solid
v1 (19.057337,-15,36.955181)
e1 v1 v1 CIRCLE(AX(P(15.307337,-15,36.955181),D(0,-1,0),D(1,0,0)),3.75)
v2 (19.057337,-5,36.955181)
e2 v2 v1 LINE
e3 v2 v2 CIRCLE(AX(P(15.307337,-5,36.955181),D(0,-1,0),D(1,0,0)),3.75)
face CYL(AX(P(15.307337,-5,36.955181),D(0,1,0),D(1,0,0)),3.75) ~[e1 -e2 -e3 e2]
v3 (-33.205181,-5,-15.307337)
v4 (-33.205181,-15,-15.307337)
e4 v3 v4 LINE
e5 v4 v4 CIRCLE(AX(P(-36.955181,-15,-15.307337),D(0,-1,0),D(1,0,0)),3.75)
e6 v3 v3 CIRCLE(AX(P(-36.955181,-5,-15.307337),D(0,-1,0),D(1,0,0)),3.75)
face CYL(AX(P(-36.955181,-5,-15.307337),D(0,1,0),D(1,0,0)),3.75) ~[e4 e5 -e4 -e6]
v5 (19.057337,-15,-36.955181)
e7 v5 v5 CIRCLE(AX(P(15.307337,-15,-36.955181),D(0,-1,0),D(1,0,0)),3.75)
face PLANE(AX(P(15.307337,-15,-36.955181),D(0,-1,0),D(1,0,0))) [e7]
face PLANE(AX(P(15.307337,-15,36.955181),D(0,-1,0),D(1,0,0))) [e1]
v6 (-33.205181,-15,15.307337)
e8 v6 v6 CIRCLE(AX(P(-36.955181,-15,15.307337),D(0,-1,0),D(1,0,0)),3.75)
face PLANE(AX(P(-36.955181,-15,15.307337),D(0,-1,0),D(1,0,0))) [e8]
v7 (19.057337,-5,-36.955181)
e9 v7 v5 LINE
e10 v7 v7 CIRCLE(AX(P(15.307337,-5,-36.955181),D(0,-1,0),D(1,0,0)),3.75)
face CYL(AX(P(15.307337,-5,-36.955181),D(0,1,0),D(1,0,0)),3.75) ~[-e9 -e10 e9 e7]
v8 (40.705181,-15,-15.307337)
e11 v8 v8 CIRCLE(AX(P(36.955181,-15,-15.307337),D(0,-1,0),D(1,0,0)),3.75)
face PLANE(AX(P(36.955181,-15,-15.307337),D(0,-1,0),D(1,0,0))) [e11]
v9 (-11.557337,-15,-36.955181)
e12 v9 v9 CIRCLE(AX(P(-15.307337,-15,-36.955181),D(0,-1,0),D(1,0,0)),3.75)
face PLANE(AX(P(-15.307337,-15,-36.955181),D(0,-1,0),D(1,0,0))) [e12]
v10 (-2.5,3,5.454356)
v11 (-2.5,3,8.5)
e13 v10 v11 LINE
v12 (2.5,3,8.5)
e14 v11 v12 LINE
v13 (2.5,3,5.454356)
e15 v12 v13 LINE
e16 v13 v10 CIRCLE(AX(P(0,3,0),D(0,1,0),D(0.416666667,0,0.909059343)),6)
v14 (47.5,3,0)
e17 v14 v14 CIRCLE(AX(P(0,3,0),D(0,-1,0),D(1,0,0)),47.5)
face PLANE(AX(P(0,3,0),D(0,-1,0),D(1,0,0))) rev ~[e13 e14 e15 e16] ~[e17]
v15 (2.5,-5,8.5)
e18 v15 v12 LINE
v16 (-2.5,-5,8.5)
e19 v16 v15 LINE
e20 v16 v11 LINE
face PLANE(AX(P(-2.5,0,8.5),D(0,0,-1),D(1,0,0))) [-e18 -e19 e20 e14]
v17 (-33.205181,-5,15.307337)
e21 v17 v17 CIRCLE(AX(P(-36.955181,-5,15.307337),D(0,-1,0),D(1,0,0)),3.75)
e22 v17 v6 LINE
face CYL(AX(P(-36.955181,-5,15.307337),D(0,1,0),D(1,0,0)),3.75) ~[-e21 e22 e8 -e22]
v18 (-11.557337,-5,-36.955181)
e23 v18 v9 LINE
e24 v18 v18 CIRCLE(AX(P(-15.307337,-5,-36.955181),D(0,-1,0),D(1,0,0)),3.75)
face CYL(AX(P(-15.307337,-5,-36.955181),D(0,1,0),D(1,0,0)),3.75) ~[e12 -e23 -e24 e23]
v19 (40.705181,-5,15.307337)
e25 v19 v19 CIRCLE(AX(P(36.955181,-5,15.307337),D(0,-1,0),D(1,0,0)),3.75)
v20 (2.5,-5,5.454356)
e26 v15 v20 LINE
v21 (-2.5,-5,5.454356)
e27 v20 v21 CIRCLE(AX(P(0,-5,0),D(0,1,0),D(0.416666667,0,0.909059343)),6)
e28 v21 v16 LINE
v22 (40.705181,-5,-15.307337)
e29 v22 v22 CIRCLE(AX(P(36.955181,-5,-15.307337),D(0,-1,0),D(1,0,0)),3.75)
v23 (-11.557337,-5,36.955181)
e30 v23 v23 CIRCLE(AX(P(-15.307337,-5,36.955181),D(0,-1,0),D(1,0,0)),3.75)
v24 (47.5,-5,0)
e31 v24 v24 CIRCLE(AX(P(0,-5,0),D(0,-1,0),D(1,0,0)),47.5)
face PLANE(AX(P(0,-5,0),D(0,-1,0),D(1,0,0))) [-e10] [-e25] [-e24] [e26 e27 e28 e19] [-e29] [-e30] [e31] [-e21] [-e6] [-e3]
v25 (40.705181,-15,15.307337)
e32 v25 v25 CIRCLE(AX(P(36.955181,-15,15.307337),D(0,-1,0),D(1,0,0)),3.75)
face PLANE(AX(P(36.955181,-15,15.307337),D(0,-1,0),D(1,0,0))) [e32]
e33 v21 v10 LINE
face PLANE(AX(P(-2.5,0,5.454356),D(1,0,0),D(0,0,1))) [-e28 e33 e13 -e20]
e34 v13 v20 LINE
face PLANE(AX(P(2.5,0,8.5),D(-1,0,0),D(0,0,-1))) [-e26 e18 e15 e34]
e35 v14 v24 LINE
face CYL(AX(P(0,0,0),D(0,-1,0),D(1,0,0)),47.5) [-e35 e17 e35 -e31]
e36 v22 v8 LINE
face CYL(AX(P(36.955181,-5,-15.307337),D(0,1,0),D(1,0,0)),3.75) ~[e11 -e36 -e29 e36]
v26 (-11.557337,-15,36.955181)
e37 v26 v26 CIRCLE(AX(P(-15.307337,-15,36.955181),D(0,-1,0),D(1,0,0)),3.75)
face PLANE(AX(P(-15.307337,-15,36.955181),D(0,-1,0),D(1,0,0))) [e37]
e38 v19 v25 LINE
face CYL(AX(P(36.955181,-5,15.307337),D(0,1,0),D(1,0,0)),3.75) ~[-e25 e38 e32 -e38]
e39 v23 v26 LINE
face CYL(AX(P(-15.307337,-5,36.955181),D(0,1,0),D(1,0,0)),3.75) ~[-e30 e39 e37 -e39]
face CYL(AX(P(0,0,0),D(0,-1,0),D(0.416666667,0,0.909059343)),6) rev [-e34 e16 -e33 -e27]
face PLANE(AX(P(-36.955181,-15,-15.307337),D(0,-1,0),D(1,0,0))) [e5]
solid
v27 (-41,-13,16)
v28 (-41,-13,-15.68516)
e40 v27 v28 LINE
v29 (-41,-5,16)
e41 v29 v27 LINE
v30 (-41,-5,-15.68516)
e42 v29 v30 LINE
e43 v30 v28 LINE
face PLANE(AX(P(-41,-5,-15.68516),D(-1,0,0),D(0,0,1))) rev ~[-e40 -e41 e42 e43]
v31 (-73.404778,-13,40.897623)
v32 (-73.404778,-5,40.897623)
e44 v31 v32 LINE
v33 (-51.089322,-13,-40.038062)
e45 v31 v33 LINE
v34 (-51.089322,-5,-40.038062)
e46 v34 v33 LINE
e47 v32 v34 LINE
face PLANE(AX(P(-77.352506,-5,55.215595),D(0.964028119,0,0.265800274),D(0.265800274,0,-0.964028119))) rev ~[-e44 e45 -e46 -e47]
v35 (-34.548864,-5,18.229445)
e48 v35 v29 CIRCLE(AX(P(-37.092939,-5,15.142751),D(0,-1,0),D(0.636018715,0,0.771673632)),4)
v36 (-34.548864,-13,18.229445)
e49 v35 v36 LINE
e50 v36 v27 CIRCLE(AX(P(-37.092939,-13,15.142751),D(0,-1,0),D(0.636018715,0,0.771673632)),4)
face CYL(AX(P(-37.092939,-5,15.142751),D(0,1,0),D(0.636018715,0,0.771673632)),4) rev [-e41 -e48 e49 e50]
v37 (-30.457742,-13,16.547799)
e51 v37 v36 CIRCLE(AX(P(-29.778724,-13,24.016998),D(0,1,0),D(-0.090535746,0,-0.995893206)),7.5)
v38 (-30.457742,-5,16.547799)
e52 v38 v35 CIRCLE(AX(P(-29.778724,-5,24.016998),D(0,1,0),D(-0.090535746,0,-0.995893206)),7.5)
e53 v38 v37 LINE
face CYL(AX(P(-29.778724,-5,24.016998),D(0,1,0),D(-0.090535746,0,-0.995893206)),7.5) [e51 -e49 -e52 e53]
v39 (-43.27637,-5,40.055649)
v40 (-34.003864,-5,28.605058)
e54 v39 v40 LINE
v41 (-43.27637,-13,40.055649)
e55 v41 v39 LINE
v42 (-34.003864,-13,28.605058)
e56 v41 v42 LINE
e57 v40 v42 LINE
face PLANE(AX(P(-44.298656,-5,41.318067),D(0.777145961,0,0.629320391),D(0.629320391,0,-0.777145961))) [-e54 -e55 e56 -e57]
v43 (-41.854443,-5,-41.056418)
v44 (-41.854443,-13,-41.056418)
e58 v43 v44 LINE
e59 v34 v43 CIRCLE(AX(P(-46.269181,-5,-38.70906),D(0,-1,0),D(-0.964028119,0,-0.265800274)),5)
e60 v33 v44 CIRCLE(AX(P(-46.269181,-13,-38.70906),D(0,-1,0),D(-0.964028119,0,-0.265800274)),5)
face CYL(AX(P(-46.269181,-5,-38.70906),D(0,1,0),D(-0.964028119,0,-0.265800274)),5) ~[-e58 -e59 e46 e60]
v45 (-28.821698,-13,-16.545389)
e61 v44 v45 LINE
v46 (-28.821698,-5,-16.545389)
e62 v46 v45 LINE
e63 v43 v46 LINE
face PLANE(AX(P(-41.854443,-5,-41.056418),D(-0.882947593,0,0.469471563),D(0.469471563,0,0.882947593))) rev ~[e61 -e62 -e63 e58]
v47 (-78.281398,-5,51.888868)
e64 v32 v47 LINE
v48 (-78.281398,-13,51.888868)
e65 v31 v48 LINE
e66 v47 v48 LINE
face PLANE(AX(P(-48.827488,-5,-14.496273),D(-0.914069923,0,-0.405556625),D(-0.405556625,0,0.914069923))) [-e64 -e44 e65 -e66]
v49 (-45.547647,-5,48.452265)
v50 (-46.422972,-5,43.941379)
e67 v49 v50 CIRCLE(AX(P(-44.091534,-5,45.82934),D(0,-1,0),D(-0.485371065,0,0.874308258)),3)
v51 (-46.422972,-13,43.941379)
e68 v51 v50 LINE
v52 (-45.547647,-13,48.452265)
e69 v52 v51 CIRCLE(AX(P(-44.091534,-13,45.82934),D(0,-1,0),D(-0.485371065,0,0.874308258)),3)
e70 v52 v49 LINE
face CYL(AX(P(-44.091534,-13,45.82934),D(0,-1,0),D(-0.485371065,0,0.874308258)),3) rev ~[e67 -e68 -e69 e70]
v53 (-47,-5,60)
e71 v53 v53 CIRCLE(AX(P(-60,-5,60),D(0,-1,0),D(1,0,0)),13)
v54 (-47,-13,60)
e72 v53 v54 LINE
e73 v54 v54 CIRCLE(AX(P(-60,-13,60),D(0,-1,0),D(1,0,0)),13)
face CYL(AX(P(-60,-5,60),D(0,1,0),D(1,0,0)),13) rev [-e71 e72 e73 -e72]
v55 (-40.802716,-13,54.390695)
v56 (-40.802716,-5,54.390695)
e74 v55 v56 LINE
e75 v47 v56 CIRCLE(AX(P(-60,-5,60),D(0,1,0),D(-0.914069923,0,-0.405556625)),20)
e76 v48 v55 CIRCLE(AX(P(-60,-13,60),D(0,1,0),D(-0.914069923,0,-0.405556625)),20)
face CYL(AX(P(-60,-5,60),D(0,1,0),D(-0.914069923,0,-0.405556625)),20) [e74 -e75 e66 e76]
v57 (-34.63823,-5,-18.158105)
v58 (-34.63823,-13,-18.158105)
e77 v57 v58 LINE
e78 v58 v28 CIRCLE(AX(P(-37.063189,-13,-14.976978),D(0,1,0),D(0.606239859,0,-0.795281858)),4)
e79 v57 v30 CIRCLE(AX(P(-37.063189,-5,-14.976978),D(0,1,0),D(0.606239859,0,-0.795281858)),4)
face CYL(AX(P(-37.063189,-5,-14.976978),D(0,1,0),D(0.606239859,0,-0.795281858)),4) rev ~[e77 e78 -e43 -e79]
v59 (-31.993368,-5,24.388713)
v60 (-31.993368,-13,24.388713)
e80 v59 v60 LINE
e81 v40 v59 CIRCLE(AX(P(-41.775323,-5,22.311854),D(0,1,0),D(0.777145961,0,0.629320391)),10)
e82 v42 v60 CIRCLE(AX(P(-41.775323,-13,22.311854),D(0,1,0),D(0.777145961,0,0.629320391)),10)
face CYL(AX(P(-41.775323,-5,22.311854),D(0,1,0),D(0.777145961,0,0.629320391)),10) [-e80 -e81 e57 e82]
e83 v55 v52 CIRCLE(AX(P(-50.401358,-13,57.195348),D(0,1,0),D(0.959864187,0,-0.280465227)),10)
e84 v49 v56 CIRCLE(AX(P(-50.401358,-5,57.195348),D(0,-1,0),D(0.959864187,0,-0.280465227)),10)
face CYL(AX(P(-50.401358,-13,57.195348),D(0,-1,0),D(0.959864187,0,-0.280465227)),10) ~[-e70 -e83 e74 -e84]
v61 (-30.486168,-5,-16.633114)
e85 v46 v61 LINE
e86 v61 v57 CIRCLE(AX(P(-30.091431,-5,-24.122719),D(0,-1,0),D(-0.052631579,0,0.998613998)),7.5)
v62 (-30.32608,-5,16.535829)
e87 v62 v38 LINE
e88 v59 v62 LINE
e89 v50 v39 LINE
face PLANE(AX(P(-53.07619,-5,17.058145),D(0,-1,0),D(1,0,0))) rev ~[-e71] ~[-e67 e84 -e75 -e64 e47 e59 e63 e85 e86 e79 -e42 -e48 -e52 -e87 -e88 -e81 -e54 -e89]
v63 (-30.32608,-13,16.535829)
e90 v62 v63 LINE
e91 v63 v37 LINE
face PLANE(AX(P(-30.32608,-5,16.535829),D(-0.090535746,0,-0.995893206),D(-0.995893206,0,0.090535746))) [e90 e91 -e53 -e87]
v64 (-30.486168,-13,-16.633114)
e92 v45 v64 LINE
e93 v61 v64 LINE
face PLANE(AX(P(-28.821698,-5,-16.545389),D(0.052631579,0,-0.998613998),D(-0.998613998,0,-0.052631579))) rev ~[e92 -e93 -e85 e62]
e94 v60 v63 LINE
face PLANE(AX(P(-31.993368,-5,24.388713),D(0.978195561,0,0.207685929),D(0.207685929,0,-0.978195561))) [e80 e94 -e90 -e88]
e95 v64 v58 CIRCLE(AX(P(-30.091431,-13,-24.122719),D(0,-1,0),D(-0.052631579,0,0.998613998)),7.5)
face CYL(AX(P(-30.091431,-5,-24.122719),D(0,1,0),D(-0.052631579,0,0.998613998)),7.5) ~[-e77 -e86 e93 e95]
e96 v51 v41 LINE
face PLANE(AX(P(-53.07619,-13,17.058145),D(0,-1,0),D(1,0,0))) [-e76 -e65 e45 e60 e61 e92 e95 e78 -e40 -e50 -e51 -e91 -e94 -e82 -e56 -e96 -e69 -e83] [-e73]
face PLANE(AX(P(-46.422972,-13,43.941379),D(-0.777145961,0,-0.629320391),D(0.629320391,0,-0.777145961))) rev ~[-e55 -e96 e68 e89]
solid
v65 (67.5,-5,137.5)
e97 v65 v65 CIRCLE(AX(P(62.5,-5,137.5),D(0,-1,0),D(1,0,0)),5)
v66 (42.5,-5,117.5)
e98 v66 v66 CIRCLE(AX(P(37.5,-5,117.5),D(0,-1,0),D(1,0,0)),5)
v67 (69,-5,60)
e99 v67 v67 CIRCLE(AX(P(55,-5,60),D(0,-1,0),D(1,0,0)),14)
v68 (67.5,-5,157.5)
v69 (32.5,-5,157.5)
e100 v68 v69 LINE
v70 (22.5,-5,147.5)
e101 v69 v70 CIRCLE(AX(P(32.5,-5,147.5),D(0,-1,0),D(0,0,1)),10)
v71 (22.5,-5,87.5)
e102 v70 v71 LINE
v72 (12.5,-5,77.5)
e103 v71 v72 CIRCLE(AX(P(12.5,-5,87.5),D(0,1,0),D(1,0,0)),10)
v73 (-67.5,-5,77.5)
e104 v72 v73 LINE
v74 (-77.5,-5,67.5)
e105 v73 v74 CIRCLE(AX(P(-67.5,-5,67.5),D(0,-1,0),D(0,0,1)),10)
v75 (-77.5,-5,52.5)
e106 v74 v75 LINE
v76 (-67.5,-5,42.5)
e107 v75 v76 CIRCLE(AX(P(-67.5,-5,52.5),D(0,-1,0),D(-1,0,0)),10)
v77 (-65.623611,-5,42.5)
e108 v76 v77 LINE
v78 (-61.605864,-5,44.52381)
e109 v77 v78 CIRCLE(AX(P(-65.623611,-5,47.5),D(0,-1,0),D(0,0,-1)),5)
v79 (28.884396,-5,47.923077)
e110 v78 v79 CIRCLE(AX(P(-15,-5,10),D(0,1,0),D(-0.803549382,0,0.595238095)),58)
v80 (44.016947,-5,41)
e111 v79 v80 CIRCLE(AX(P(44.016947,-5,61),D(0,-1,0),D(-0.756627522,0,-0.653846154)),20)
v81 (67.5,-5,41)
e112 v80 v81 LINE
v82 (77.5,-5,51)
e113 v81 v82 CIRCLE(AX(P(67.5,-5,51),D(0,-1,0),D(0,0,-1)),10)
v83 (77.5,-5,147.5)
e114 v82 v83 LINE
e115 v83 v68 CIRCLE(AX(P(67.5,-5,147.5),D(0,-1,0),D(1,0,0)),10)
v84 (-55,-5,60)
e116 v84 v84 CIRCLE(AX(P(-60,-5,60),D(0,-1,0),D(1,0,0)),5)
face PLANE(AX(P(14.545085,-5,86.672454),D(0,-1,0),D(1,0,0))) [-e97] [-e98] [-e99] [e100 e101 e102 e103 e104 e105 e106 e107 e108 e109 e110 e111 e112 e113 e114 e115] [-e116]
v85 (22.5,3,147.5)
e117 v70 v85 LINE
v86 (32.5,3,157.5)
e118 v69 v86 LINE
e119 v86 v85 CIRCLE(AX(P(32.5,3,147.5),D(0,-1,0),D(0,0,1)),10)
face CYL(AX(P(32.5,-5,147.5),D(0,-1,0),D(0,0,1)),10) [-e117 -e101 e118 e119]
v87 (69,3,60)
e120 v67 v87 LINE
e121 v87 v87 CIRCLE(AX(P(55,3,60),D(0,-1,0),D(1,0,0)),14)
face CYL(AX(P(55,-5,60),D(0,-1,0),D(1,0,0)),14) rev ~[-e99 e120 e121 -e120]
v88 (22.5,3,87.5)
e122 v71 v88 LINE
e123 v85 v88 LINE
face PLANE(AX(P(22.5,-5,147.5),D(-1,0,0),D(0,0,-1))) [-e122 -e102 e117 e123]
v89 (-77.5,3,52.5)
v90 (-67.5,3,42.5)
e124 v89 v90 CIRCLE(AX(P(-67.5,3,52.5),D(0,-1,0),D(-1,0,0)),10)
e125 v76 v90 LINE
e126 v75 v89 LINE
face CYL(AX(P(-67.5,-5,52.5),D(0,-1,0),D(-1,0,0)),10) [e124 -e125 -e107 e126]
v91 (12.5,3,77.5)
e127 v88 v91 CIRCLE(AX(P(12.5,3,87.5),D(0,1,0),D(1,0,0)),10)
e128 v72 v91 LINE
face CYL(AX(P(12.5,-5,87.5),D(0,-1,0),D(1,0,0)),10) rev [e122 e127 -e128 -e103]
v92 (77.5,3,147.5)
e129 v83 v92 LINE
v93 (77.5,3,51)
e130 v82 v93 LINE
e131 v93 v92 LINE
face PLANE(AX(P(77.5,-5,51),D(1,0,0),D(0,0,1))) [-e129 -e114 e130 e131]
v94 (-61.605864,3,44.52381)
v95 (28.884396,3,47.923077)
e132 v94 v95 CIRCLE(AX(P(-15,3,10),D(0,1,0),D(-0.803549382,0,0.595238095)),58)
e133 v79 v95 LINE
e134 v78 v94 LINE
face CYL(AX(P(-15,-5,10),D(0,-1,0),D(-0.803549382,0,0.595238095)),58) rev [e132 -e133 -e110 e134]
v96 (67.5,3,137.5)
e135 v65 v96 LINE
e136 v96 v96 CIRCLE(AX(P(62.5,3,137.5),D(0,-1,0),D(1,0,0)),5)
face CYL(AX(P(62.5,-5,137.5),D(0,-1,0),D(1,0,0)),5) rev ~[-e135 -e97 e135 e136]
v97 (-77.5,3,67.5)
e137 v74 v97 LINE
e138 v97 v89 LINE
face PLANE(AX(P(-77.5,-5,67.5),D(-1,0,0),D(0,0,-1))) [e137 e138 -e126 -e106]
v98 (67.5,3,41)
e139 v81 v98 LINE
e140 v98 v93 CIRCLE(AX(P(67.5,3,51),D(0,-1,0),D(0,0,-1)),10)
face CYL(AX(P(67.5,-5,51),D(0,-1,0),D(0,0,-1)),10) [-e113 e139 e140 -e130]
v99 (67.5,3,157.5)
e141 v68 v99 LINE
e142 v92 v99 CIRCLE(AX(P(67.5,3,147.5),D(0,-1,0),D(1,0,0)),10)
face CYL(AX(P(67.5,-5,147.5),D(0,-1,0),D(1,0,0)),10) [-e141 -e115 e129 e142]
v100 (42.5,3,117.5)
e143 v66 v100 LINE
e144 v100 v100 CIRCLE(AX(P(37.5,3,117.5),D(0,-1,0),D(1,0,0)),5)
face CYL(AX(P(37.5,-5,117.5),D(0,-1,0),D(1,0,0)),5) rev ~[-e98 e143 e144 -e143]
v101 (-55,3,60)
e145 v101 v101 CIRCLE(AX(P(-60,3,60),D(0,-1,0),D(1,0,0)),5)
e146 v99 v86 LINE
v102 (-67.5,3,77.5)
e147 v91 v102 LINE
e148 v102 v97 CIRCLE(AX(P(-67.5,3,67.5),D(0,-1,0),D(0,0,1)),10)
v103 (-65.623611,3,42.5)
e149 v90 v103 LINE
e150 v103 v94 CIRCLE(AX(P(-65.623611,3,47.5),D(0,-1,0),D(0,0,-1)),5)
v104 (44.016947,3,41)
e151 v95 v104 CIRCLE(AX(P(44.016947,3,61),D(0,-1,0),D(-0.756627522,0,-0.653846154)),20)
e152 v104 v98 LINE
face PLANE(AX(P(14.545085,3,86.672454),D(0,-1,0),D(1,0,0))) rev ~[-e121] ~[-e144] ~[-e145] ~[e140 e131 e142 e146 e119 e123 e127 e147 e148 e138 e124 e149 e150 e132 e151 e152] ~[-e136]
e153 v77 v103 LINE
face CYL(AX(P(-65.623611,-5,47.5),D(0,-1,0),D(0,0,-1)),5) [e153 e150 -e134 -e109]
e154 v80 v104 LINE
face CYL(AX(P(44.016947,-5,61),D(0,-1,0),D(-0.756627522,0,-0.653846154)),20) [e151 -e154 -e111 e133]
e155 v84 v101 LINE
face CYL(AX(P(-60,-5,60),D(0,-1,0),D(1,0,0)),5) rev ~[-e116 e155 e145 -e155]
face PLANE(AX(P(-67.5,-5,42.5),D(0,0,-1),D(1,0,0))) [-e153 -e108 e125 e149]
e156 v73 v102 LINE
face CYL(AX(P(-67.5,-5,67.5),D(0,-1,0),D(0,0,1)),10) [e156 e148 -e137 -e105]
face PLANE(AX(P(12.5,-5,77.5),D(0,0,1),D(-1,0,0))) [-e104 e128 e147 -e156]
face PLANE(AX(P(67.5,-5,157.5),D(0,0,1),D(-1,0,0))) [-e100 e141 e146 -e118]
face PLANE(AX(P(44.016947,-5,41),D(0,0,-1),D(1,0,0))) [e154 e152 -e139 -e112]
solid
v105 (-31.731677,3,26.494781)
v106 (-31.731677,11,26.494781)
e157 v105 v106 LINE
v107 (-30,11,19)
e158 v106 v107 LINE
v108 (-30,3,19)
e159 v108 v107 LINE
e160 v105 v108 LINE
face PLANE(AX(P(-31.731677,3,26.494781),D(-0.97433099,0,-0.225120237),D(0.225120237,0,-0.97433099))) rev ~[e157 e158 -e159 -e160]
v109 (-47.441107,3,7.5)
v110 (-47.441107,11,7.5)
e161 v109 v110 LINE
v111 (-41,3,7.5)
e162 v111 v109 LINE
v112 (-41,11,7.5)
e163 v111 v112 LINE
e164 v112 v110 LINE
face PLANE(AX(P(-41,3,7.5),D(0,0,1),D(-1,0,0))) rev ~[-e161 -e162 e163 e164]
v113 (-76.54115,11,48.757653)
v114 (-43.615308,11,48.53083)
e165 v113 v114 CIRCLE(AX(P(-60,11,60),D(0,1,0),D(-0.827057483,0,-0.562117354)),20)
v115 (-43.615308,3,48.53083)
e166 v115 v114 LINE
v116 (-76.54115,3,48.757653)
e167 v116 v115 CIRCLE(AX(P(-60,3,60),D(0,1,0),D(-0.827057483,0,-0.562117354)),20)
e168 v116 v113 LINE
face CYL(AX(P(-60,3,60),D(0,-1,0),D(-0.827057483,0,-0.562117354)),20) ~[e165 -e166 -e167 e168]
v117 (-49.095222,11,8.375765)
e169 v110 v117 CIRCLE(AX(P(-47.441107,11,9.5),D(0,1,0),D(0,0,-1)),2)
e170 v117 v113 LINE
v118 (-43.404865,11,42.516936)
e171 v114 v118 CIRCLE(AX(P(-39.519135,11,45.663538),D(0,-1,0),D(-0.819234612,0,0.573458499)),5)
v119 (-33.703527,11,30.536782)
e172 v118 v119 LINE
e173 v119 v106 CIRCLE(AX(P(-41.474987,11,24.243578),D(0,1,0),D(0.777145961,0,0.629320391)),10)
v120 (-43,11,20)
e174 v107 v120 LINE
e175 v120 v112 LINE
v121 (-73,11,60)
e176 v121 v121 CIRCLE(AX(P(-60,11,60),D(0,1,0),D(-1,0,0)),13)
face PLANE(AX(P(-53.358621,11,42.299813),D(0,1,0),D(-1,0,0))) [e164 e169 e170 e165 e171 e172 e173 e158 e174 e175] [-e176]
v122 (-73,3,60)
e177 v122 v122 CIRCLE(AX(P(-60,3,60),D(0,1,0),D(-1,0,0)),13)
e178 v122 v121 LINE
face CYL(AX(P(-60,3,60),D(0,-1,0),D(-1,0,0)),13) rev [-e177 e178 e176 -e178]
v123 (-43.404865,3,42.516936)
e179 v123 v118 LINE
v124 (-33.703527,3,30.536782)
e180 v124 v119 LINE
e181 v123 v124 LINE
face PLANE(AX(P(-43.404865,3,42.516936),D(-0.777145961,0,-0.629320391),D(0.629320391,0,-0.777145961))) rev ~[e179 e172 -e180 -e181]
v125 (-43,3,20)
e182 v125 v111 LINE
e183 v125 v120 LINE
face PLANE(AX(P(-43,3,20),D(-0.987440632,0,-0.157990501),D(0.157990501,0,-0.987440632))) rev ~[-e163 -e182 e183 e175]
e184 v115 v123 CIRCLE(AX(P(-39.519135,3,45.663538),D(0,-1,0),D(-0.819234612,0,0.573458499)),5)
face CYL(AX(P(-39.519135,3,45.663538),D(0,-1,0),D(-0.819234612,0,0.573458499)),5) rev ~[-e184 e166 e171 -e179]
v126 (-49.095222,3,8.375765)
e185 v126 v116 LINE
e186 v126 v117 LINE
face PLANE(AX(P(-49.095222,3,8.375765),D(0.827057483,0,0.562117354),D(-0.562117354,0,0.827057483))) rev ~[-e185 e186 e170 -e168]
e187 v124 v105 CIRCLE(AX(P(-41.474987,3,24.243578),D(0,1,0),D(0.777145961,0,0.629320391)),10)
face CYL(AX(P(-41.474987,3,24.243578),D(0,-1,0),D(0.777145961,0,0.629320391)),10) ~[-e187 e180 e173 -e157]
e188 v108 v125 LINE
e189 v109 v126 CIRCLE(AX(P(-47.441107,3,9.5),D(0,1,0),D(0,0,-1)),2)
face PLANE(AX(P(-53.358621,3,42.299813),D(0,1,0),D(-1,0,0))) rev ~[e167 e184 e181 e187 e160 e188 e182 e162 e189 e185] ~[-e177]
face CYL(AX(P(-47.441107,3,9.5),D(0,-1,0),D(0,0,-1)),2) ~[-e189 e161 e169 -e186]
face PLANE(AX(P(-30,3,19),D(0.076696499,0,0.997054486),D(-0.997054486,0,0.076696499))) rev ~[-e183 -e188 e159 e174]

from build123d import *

# Parameters (mm, degrees)
F0_R          = 47.5
F1_DEPTH      = 5
F1_DEPTH_BACK = 3
F2_R          = 3.75
F3_DEPTH      = 10
F5_R          = 5
F5_R_2        = 14
F6_DEPTH      = 8
F7_R          = 13
F8_DEPTH      = 8
F11_R         = 13
F12_DEPTH     = 8
F13_R         = 13
F14_DEPTH     = 8
F16_DEPTH     = 25


with BuildPart() as f1:
    # F0 (on Front) → F1 (new body, two sides)
    with BuildSketch(Plane.XZ) as f1_sk:
        Circle(F0_R)
        with BuildLine():
            ThreePointArc((2.5, 5.4543560573), (0, -6), (-2.5, 5.4543560573))
            Line((-2.5, 5.4543560573), (-2.5, 8.5))
            Line((-2.5, 8.5), (2.5, 8.5))
            Line((2.5, 8.5), (2.5, 5.4543560573))
        make_face(mode=Mode.SUBTRACT)
    extrude(amount=F1_DEPTH)
    extrude(f1_sk.sketch, amount=-F1_DEPTH_BACK)

    # F2 (on face) → F3 (join)
    with BuildSketch(Plane.XZ.offset(5)):
        with Locations((15.3073372946, 36.9551813005)):
            Circle(F2_R)
        with Locations((-15.3073372946, 36.9551813005)):
            Circle(F2_R)
        with Locations((-36.9551813005, 15.3073372946)):
            Circle(F2_R)
        with Locations((-36.9551813005, -15.3073372946)):
            Circle(F2_R)
        with Locations((-15.3073372946, -36.9551813005)):
            Circle(F2_R)
        with Locations((15.3073372946, -36.9551813005)):
            Circle(F2_R)
        with Locations((36.9551813005, -15.3073372946)):
            Circle(F2_R)
        with Locations((36.9551813005, 15.3073372946)):
            Circle(F2_R)
    extrude(amount=F3_DEPTH)


with BuildPart() as f6:
    # F5 (on face) → F6 (new body)
    with BuildSketch(Plane.XZ.offset(5)):
        with BuildLine():
            ThreePointArc((32.5, 157.5), (25.4289321881, 154.5710678119), (22.5, 147.5))
            Line((22.5, 147.5), (22.5, 87.5))
            ThreePointArc((22.5, 87.5), (19.5710678119, 80.4289321881), (12.5, 77.5))
            Line((12.5, 77.5), (-67.5, 77.5))
            ThreePointArc((-67.5, 77.5), (-74.5710678119, 74.5710678119), (-77.5, 67.5))
            Line((-77.5, 67.5), (-77.5, 52.5))
            ThreePointArc((-77.5, 52.5), (-74.5710678119, 45.4289321881), (-67.5, 42.5))
            Line((-67.5, 42.5), (-65.6236110921, 42.5))
            ThreePointArc((-65.6236110921, 42.5), (-63.374272565, 43.0345239682), (-61.60586418, 44.5238095238))
            ThreePointArc((-61.60586418, 44.5238095238), (-17.1772348514, 67.9591204937), (28.884396278, 47.9230769231))
            ThreePointArc((28.884396278, 47.9230769231), (35.6964437753, 42.8129378192), (44.0169467187, 41))
            Line((44.0169467187, 41), (67.5, 41))
            ThreePointArc((67.5, 41), (74.5710678119, 43.9289321881), (77.5, 51))
            Line((77.5, 51), (77.5, 147.5))
            ThreePointArc((77.5, 147.5), (74.5710678119, 154.5710678119), (67.5, 157.5))
            Line((67.5, 157.5), (32.5, 157.5))
        make_face()
        with Locations((-60, 60)):
            Circle(F5_R, mode=Mode.SUBTRACT)
        with Locations((55, 60)):
            Circle(F5_R_2, mode=Mode.SUBTRACT)
        with Locations((37.5, 117.5)):
            Circle(F5_R, mode=Mode.SUBTRACT)
        with Locations((62.5, 137.5)):
            Circle(F5_R, mode=Mode.SUBTRACT)
    extrude(amount=-F6_DEPTH)


with BuildPart() as f8:
    # F7 (on face) → F8 (new body)
    with BuildSketch(Plane.XZ.offset(5)):
        with BuildLine():
            Line((-45.5454252447, 5.6539239871), (-42.0390263481, 58.8153374007))
            ThreePointArc((-42.0390263481, 58.8153374007), (-61.8254025331, 77.9072026177), (-77.3525061409, 55.21559506))
            Line((-77.3525061409, 55.21559506), (-51.0893218746, -40.0380617645))
            ThreePointArc((-51.0893218746, -40.0380617645), (-46.817223508, -43.6789346076), (-41.8544433156, -41.0564182062))
            Line((-41.8544433156, -41.0564182062), (-28.8216980003, -16.5453891757))
            Line((-28.8216980003, -16.5453891757), (-30.4861678116, -16.6331144374))
            ThreePointArc((-30.4861678116, -16.6331144374), (-32.6771791019, -17.0825556032), (-34.638229912, -18.1581054885))
            ThreePointArc((-34.638229912, -18.1581054885), (-38.5124264489, -18.7052097863), (-41, -15.6851601597))
            Line((-41, -15.6851601597), (-41, -1.6851601597))
            Line((-41, -1.6851601597), (-45.5454252447, 5.6539239871))
        make_face()
        with Locations((-60, 60)):
            Circle(F7_R, mode=Mode.SUBTRACT)
    extrude(amount=F8_DEPTH)

    # F13 (on face) → F14 (join)
    with BuildSketch(Plane(origin=(0, -5, 0), x_dir=(-1, 0, 0), z_dir=(0, 1, 0))):
        with BuildLine():
            Line((48.8274879805, -14.4962734092), (78.2813984598, 51.8888675048))
            ThreePointArc((78.2813984598, 51.8888675048), (57.4771635507, 79.8402443596), (44.3303405904, 47.5717348762))
            ThreePointArc((44.3303405904, 47.5717348762), (45.4128615623, 44.4393357528), (44.2986555453, 41.31806664))
            Line((44.2986555453, 41.31806664), (34.003863851, 28.6050576495))
            ThreePointArc((34.003863851, 28.6050576495), (32.7489738734, 26.6159230972), (31.9933678596, 24.3887130319))
            Line((31.9933678596, 24.3887130319), (30.3260801171, 16.5358292403))
            Line((30.3260801171, 16.5358292403), (30.4577421115, 16.5477985125))
            ThreePointArc((30.4577421115, 16.5477985125), (32.6300949094, 17.0801622574), (34.5488643782, 18.2294453214))
            ThreePointArc((34.5488643782, 18.2294453214), (38.3994763606, 18.9233540189), (41, 16))
            Line((41, 16), (41, -15.6851601597))
            Line((41, -15.6851601597), (46.9993481346, -15.6851601597))
            ThreePointArc((46.9993481346, -15.6851601597), (48.0897089695, -15.3617976427), (48.8274879805, -14.4962734092))
        make_face()
        with Locations((60, 60)):
            Circle(F13_R, mode=Mode.SUBTRACT)
    extrude(amount=-F14_DEPTH)

    # F15 (on face) → F16 (cut)
    with BuildSketch(Plane.XZ.offset(13)):
        with BuildLine():
            Line((-46.4229721787, 43.9413792102), (-43.2763702235, 40.0556494029))
            Line((-43.2763702235, 40.0556494029), (-35.2763702235, 40.0556494029))
            Line((-35.2763702235, 40.0556494029), (-35.2763702235, 54.3906954695))
            Line((-35.2763702235, 54.3906954695), (-40.8027162681, 54.3906954695))
            ThreePointArc((-40.8027162681, 54.3906954695), (-42.5889409712, 50.953061449), (-45.5476474881, 48.4522651567))
            ThreePointArc((-45.5476474881, 48.4522651567), (-47.0365994546, 46.4008219683), (-46.4229721787, 43.9413792102))
        make_face()
    extrude(amount=-F16_DEPTH, mode=Mode.SUBTRACT)


with BuildPart() as f12:
    # F11 (on face) → F12 (new body)
    with BuildSketch(Plane(origin=(0, 3, 0), x_dir=(-1, 0, 0), z_dir=(0, 1, 0))):
        with BuildLine():
            Line((49.0952220718, 8.375765293), (76.5411496684, 48.7576529298))
            ThreePointArc((76.5411496684, 48.7576529298), (59.8622252185, 79.9995254471), (43.615307759, 48.530830014))
            ThreePointArc((43.615307759, 48.530830014), (44.5160762599, 45.4886803355), (43.404864506, 42.5169355623))
            Line((43.404864506, 42.5169355623), (33.7035274984, 30.536782077))
            ThreePointArc((33.7035274984, 30.536782077), (32.4874272694, 28.6280699339), (31.7316772086, 26.4947805356))
            Line((31.7316772086, 26.4947805356), (30, 19))
            Line((30, 19), (43, 20))
            Line((43, 20), (41, 7.5))
            Line((41, 7.5), (47.441107105, 7.5))
            ThreePointArc((47.441107105, 7.5), (48.3769304286, 7.7324495178), (49.0952220718, 8.375765293))
        make_face()
        with Locations((60, 60)):
            Circle(F11_R, mode=Mode.SUBTRACT)
    extrude(amount=F12_DEPTH)


solid = Compound([f1.part, f6.part, f8.part, f12.part])
